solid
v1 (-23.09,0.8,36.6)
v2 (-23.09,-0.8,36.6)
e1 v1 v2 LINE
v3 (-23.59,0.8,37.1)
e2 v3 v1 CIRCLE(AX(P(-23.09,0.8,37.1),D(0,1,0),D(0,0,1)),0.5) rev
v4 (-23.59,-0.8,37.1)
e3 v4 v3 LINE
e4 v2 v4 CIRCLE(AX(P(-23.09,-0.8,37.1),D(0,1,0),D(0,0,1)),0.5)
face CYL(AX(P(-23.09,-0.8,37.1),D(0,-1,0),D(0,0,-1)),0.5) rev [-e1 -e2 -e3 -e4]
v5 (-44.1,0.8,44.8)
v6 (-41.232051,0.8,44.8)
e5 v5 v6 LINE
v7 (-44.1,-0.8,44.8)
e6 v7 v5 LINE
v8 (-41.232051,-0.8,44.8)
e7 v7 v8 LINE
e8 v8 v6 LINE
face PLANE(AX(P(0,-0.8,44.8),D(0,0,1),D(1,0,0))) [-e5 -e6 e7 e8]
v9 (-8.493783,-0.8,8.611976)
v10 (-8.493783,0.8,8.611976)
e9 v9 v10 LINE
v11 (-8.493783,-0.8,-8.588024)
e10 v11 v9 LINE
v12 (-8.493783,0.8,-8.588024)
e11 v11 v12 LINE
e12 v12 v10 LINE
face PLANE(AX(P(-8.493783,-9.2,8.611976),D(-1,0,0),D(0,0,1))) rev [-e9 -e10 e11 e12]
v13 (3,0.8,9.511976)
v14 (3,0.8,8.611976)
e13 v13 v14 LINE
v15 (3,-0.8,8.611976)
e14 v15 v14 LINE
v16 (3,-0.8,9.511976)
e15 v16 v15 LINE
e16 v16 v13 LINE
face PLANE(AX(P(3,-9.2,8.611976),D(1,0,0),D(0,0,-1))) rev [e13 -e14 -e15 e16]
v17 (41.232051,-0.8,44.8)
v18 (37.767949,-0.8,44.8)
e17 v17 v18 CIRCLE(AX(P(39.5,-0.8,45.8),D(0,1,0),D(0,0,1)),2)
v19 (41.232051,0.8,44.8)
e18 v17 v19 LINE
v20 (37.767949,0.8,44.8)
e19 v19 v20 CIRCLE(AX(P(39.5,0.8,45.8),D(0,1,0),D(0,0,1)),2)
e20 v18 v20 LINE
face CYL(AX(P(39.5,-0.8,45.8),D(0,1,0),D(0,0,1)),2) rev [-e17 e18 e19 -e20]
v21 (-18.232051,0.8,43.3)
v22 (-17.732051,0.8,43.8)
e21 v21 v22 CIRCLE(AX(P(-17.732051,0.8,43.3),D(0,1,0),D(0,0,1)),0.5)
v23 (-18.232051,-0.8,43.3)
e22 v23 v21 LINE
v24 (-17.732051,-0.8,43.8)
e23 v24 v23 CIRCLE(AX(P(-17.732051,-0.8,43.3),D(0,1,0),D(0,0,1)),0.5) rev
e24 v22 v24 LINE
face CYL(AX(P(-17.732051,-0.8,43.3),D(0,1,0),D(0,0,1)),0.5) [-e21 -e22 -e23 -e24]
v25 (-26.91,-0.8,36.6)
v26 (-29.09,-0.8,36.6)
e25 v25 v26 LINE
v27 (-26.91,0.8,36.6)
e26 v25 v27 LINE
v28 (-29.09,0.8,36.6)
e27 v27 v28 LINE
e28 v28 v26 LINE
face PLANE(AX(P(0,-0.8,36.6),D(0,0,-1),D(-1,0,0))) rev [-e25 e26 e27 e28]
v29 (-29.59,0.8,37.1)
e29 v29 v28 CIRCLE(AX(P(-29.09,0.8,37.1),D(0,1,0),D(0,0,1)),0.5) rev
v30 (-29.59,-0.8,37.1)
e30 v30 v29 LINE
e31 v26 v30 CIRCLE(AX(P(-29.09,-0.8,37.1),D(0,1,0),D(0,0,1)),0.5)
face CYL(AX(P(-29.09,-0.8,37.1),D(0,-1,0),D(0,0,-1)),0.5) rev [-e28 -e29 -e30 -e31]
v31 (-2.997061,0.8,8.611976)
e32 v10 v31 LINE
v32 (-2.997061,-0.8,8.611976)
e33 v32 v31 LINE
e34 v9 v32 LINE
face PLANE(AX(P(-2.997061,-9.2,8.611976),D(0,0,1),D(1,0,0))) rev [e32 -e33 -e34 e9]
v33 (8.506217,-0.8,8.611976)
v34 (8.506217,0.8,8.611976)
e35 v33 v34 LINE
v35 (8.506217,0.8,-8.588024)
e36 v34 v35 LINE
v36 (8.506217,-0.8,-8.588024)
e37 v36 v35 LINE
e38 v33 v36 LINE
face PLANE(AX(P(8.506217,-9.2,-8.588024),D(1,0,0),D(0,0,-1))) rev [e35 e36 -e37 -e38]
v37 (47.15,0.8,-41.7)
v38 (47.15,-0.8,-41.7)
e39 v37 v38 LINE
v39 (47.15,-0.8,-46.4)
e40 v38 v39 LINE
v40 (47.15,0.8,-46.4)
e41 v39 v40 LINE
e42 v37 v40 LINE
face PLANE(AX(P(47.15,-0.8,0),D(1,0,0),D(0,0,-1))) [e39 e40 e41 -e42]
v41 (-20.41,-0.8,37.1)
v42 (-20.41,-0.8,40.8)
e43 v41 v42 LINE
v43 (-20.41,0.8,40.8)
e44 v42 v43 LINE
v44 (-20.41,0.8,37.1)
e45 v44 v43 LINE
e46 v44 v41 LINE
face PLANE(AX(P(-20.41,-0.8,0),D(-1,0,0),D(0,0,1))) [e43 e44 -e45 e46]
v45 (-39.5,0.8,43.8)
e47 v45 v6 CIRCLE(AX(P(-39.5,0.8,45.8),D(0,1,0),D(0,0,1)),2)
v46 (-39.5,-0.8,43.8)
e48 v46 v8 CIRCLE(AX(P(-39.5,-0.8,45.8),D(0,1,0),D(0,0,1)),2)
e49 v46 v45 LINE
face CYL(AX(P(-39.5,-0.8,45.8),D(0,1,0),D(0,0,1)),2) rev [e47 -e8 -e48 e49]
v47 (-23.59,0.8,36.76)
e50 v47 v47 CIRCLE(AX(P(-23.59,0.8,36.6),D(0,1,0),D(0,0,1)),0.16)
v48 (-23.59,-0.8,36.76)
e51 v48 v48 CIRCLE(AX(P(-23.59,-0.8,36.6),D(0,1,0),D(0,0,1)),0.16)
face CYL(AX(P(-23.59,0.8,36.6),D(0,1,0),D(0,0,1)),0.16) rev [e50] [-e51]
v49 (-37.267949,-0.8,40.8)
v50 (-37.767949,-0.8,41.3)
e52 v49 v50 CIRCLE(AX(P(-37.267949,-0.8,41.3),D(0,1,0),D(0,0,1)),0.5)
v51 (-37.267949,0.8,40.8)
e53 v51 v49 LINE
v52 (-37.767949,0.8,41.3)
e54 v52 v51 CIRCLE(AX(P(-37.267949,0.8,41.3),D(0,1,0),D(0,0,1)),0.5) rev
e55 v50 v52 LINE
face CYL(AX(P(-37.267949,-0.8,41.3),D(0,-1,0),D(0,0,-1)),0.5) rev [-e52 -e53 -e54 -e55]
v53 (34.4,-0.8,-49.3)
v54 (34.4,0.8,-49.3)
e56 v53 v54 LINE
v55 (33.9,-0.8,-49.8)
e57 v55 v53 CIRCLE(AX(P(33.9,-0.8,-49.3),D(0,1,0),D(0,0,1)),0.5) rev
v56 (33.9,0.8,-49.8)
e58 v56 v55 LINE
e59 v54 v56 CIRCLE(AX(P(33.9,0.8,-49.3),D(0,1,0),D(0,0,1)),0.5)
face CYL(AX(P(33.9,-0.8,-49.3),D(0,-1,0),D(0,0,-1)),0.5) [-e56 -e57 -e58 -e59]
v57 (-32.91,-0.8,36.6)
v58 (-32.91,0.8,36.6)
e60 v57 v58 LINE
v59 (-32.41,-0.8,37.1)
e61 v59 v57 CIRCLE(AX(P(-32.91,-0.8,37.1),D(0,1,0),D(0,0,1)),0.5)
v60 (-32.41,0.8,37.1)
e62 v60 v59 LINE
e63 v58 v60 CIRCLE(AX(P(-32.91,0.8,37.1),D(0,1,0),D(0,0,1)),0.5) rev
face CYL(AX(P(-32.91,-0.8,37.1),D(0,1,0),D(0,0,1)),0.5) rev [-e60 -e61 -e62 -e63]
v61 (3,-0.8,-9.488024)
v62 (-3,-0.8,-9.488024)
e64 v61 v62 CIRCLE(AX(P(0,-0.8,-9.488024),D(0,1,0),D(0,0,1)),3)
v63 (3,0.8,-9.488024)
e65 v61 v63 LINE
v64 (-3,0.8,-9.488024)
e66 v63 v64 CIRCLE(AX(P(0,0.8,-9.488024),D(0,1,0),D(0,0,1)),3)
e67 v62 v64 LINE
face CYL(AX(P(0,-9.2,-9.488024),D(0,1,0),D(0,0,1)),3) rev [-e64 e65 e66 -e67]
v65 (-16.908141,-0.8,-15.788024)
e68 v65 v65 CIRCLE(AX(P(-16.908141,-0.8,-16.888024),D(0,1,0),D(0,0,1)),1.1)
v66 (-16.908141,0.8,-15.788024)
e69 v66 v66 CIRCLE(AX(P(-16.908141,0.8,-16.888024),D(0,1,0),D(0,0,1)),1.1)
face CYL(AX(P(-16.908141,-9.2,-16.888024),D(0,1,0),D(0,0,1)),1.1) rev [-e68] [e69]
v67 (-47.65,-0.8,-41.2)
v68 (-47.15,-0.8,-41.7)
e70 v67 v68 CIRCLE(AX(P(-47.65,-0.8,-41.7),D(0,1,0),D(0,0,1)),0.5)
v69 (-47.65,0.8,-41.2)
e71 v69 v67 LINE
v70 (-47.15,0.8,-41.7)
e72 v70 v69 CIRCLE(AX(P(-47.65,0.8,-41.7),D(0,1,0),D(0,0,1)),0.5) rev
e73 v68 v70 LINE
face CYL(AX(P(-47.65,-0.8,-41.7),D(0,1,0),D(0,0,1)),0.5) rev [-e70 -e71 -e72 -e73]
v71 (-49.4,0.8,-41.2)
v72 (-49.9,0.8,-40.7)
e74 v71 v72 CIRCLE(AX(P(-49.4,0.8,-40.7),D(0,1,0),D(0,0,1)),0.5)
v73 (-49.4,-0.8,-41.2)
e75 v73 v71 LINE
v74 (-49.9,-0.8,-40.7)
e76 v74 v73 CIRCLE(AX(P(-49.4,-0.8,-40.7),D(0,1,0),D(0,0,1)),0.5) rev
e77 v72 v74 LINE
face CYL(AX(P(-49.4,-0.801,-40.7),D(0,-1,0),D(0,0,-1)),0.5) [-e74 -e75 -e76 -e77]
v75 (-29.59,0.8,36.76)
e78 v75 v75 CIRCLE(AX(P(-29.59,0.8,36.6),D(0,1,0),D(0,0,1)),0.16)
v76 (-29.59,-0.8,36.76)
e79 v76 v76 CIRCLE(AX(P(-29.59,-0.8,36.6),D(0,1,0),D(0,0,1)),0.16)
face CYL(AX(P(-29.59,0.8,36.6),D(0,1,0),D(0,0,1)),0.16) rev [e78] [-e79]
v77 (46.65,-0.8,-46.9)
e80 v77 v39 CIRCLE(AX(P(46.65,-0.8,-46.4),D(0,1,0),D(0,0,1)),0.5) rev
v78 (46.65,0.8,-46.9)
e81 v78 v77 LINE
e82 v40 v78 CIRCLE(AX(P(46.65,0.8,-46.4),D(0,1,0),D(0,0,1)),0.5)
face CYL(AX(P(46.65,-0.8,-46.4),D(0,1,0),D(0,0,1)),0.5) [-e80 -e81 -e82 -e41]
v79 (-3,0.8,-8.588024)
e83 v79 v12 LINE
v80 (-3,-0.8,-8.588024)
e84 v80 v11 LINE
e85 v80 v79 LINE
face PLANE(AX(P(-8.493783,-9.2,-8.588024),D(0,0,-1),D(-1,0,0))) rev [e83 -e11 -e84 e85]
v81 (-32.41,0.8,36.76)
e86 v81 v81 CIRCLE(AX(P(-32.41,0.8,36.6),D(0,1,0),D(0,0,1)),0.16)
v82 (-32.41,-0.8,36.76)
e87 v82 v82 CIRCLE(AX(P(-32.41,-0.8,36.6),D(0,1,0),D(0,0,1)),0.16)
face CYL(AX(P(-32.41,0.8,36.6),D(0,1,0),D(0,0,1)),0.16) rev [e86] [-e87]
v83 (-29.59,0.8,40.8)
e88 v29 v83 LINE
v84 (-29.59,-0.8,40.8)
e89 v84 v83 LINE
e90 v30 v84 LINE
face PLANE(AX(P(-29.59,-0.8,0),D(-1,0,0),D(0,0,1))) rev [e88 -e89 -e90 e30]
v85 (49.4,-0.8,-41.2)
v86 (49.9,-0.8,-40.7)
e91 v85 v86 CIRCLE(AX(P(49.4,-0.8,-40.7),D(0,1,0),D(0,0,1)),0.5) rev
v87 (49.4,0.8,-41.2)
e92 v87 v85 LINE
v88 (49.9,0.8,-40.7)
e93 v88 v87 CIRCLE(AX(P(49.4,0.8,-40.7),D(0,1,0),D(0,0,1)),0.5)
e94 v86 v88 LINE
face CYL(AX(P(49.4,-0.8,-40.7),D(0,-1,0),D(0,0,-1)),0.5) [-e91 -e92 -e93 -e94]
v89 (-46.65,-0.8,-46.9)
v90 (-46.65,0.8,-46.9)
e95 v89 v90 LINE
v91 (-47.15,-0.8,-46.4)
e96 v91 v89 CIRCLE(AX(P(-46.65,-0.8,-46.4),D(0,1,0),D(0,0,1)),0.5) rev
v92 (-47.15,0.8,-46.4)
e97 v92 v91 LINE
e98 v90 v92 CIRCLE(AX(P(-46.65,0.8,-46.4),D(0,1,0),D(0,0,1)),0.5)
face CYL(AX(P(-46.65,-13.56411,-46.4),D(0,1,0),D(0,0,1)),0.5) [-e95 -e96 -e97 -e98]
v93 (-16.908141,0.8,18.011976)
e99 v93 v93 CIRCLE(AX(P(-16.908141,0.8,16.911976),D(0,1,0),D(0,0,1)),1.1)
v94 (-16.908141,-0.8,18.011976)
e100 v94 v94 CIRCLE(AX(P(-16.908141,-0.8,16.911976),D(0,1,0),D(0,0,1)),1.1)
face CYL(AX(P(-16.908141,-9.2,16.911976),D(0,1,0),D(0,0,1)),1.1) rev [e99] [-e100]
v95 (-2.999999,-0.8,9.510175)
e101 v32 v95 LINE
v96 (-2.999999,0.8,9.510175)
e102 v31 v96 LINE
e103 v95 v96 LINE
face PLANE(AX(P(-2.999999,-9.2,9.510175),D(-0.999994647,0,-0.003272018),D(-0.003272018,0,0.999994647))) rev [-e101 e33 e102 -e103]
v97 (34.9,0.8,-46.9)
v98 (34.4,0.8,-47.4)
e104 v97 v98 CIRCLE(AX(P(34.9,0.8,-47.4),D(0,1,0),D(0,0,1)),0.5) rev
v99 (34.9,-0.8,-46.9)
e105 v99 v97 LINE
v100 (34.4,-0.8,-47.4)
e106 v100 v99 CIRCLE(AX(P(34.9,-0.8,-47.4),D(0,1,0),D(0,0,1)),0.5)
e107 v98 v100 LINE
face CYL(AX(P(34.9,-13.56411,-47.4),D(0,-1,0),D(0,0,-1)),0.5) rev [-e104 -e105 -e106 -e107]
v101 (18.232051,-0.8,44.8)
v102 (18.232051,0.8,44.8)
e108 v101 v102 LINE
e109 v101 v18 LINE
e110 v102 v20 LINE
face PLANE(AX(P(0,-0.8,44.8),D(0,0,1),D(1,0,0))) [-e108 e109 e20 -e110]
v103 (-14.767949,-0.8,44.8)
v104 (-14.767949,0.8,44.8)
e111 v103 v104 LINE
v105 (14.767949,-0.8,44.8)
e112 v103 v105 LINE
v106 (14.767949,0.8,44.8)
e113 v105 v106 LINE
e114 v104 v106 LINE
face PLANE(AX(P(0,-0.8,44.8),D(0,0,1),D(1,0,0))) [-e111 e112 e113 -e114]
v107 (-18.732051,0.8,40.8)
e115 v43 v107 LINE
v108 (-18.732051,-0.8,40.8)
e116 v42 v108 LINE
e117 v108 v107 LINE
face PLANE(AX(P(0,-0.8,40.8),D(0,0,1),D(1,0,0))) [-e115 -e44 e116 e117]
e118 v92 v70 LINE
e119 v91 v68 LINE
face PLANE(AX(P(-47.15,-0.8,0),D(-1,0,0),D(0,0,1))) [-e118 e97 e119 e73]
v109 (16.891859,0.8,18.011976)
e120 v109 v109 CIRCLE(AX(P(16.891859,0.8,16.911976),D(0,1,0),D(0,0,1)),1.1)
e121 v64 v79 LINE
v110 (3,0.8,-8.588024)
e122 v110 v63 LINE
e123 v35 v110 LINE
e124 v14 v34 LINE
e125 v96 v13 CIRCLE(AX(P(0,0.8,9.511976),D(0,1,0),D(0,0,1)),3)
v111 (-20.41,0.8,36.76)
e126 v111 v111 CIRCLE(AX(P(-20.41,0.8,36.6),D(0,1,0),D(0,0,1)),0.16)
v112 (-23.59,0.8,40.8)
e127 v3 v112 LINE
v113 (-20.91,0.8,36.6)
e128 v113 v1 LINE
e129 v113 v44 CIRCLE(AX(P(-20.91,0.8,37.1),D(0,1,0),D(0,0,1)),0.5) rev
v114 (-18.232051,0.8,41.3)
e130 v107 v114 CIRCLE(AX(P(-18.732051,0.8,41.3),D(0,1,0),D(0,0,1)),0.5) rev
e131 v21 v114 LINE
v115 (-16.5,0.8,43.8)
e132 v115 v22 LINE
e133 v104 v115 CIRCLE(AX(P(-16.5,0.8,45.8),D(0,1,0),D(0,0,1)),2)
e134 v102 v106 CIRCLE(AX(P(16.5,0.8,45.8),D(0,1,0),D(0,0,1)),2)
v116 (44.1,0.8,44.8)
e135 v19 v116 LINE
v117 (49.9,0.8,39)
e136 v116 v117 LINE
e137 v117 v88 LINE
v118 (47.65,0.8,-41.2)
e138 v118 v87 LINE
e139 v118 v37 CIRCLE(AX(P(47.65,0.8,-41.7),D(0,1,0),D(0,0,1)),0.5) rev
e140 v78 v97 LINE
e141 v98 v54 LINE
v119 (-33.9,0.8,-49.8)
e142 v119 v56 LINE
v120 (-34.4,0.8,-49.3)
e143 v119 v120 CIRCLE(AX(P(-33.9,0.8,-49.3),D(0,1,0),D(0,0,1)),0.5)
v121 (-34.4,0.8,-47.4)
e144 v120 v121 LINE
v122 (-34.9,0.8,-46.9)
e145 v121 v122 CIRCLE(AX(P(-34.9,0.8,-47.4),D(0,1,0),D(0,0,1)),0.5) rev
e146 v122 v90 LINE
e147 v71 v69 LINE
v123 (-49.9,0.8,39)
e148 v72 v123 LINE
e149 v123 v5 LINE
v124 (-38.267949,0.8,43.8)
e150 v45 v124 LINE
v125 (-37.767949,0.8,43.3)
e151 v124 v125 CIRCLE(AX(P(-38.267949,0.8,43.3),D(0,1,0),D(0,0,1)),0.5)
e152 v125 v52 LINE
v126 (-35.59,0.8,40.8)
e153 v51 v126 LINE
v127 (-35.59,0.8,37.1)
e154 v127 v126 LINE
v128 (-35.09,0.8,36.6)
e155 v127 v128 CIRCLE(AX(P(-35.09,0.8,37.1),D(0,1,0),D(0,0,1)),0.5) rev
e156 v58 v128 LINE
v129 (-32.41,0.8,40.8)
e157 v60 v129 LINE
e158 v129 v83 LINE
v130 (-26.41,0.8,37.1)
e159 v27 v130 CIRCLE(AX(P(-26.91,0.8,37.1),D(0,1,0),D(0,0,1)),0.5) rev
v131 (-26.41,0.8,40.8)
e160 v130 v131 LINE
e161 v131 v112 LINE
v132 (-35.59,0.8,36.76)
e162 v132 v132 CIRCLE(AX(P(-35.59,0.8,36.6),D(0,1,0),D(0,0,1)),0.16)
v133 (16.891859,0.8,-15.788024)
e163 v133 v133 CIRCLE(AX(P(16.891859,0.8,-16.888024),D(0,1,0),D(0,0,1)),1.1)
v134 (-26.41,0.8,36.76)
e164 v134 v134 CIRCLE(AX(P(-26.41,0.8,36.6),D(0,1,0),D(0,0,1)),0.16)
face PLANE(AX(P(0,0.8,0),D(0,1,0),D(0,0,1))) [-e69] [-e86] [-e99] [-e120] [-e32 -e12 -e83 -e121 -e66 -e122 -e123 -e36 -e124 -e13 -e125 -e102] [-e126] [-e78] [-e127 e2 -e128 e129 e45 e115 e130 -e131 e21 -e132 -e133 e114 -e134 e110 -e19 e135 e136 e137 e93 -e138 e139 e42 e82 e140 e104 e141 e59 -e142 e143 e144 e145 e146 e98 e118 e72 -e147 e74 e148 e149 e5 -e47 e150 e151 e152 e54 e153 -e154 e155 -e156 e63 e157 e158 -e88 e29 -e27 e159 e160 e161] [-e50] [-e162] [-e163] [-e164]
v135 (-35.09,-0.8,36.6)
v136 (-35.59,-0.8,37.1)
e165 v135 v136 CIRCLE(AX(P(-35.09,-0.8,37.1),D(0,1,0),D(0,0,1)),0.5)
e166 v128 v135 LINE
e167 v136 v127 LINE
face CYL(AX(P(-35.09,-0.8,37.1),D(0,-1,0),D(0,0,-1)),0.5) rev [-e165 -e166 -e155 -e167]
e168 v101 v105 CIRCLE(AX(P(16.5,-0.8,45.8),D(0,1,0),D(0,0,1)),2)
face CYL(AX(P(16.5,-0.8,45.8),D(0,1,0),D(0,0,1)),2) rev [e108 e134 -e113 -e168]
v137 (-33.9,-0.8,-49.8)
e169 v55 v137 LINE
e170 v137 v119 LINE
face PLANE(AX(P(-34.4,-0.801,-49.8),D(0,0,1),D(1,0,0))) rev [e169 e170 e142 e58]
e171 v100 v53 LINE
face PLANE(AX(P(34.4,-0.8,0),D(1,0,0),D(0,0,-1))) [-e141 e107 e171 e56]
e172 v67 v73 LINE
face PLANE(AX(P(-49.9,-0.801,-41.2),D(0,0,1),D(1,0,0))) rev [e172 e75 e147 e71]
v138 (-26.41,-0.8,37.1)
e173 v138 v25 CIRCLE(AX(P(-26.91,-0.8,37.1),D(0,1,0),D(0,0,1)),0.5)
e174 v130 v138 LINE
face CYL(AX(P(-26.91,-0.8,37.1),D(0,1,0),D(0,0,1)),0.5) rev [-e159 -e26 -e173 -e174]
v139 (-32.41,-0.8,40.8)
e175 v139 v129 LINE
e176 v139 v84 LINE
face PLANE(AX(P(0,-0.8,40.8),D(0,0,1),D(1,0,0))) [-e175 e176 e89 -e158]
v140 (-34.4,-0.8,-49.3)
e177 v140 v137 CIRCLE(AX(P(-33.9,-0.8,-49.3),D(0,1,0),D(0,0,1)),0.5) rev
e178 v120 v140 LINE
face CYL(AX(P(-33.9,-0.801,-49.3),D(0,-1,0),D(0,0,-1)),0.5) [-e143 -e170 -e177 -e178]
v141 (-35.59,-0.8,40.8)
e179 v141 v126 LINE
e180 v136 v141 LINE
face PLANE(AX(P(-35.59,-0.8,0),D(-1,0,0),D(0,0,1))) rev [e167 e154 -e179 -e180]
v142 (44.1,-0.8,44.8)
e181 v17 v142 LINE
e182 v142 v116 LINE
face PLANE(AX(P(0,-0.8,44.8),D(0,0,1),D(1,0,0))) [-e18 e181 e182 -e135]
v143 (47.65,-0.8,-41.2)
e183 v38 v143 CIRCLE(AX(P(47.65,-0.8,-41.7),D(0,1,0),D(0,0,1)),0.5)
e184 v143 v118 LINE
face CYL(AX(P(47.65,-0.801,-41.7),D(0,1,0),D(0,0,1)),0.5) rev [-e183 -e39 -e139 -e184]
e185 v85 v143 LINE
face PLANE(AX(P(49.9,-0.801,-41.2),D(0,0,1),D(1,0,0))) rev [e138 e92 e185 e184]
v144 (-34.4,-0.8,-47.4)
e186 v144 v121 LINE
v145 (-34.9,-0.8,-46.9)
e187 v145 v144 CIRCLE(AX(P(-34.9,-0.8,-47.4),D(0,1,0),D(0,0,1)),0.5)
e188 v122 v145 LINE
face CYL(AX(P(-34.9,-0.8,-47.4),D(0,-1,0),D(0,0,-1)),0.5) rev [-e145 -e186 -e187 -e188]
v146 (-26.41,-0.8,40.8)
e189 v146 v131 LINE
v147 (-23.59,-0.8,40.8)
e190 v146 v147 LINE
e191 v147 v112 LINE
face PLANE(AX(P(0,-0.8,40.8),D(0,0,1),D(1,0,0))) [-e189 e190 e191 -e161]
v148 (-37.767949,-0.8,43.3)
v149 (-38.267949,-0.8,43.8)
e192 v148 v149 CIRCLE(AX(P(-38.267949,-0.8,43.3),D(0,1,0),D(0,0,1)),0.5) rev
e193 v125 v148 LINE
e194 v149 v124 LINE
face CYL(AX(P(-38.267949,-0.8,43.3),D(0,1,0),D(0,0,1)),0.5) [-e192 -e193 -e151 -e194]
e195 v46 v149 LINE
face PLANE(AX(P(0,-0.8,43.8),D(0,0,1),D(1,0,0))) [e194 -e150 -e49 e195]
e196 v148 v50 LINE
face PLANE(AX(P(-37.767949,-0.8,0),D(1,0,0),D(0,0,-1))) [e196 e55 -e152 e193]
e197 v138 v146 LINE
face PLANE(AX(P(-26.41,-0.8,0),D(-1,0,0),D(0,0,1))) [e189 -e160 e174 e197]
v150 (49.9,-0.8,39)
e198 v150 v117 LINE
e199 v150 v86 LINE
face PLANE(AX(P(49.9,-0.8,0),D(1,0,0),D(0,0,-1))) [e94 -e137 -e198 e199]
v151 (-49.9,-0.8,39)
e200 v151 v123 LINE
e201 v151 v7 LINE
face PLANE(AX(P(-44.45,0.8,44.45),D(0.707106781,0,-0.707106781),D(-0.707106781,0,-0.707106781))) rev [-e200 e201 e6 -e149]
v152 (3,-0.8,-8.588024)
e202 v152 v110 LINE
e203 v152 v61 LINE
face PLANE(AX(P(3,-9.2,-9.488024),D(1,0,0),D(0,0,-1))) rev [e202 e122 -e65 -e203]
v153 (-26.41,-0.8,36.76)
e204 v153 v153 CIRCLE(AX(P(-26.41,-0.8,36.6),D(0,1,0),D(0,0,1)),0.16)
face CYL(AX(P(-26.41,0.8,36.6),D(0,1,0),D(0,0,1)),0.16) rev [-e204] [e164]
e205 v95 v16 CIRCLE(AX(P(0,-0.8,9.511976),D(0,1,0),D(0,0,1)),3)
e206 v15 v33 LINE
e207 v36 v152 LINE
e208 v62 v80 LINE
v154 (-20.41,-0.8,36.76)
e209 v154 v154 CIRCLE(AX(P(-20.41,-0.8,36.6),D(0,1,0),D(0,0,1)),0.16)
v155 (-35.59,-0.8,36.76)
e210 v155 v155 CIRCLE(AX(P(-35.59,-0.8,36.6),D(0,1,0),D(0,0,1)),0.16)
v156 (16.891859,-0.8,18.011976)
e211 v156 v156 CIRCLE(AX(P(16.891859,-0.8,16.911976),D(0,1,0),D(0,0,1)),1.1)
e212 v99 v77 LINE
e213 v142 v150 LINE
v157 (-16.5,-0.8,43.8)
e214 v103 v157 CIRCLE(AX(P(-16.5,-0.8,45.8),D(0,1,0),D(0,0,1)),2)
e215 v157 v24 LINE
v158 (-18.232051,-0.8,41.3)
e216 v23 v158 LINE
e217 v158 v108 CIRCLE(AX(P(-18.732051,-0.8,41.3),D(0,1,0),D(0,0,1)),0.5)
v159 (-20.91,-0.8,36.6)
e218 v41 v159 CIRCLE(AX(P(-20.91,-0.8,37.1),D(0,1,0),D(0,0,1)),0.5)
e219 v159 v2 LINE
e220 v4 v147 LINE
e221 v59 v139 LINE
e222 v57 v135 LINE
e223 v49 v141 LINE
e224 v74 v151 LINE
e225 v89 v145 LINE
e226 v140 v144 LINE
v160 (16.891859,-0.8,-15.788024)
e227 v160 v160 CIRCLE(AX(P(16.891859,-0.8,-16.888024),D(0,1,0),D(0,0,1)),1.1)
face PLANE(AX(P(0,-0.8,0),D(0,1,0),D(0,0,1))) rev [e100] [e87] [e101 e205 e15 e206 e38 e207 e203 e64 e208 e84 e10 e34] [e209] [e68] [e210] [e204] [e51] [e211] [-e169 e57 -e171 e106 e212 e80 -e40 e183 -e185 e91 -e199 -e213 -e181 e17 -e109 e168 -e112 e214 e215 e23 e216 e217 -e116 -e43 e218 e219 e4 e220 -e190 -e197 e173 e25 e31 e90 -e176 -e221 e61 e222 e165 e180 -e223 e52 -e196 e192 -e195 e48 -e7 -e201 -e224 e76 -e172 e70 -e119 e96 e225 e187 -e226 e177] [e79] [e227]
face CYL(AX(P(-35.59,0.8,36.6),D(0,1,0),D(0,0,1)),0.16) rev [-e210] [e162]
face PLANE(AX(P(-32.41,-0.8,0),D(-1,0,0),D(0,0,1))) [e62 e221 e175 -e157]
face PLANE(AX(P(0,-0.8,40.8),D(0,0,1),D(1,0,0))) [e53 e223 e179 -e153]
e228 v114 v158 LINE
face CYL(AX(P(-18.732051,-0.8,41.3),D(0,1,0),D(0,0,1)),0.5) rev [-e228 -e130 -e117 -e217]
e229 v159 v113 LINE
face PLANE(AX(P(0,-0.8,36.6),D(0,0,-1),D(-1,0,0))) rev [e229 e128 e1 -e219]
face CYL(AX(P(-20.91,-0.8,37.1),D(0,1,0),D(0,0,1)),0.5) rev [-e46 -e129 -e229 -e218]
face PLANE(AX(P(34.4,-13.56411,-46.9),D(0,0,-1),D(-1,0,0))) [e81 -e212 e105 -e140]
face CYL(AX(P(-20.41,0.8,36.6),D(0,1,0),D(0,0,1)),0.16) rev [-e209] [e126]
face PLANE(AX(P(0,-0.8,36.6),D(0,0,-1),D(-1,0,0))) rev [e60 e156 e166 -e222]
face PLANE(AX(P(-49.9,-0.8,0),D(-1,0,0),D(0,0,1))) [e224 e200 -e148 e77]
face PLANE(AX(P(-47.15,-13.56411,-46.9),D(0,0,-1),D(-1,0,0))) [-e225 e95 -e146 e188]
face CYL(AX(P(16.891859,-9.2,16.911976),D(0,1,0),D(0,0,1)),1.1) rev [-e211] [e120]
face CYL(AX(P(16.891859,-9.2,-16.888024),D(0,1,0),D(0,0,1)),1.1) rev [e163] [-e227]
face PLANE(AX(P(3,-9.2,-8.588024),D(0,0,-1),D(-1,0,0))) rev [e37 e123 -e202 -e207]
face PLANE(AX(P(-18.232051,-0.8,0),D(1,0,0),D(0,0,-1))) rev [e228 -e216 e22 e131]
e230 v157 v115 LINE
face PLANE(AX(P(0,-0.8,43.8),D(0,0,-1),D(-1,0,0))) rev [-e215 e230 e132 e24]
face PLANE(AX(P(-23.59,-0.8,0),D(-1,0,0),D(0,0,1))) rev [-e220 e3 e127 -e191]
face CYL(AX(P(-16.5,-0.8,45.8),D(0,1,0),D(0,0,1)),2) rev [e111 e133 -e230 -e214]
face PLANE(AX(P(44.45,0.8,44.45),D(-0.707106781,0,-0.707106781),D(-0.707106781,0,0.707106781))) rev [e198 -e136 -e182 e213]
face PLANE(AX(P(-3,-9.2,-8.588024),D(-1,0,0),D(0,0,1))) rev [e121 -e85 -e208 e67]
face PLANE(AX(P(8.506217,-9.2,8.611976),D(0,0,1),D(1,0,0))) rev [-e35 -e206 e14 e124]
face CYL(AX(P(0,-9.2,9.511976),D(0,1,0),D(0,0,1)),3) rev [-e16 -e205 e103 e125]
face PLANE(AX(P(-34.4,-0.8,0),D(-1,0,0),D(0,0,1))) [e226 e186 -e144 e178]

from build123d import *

# Parameters (mm, degrees)
GENERICCARDPCBDEFINITION_FILLET3_START   = -0.8
GENERICCARDPCBDEFINITION_FILLET3_OUTLI_R = 0.16
GENERICCARDPCBDEFINITION_FILLET3_DEPTH   = 1.6
SKETCH1_R                                = 1.1
CUT_EXTRUDE1_DEPTH                       = 10


# Read off the part's stored shape, not the designer's step: <GenericCardPCBDefinition>-<Fillet3>
with BuildPart() as part:
    # <GenericCardPCBDefinition>-<Fillet3> outli → <GenericCardPCBDefinition>-<Fillet3> (new body)
    with BuildSketch(Plane(origin=(0, 0, 0), x_dir=(1, 0, 0), z_dir=(0, 1, 0)).offset(GENERICCARDPCBDEFINITION_FILLET3_START)):
        with BuildLine():
            ThreePointArc((-41.232050808, -44.8), (-40.5, -44.067949192), (-39.5, -43.8))
            Line((-39.5, -43.8), (-38.267949192, -43.8))
            ThreePointArc((-38.267949192, -43.8), (-37.914395801, -43.653553391), (-37.767949192, -43.3))
            Line((-37.767949192, -43.3), (-37.767949192, -41.3))
            ThreePointArc((-37.767949192, -41.3), (-37.621502583, -40.946446609), (-37.267949192, -40.8))
            Line((-37.267949192, -40.8), (-35.59, -40.8))
            Line((-35.59, -40.8), (-35.59, -37.1))
            ThreePointArc((-35.59, -37.1), (-35.443553391, -36.746446609), (-35.09, -36.6))
            Line((-35.09, -36.6), (-32.91, -36.6))
            ThreePointArc((-32.91, -36.6), (-32.556446609, -36.746446609), (-32.41, -37.1))
            Line((-32.41, -37.1), (-32.41, -40.8))
            Line((-32.41, -40.8), (-29.59, -40.8))
            Line((-29.59, -40.8), (-29.59, -37.1))
            ThreePointArc((-29.59, -37.1), (-29.443553391, -36.746446609), (-29.09, -36.6))
            Line((-29.09, -36.6), (-26.91, -36.6))
            ThreePointArc((-26.91, -36.6), (-26.556446609, -36.746446609), (-26.41, -37.1))
            Line((-26.41, -37.1), (-26.41, -40.8))
            Line((-26.41, -40.8), (-23.59, -40.8))
            Line((-23.59, -40.8), (-23.59, -37.1))
            ThreePointArc((-23.59, -37.1), (-23.443553391, -36.746446609), (-23.09, -36.6))
            Line((-23.09, -36.6), (-20.91, -36.6))
            ThreePointArc((-20.91, -36.6), (-20.556446609, -36.746446609), (-20.41, -37.1))
            Line((-20.41, -37.1), (-20.41, -40.8))
            Line((-20.41, -40.8), (-18.732050808, -40.8))
            ThreePointArc((-18.732050808, -40.8), (-18.378497417, -40.946446609), (-18.232050808, -41.3))
            Line((-18.232050808, -41.3), (-18.232050808, -43.3))
            ThreePointArc((-18.232050808, -43.3), (-18.085604199, -43.653553391), (-17.732050808, -43.8))
            Line((-17.732050808, -43.8), (-16.5, -43.8))
            ThreePointArc((-16.5, -43.8), (-15.5, -44.067949192), (-14.767949192, -44.8))
            Line((-14.767949192, -44.8), (14.767949192, -44.8))
            ThreePointArc((14.767949192, -44.8), (16.5, -43.8), (18.232050808, -44.8))
            Line((18.232050808, -44.8), (37.767949192, -44.8))
            ThreePointArc((37.767949192, -44.8), (39.5, -43.8), (41.232050808, -44.8))
            Line((41.232050808, -44.8), (44.1, -44.8))
            Line((44.1, -44.8), (49.9, -39))
            Line((49.9, -39), (49.9, 40.7))
            ThreePointArc((49.9, 40.7), (49.753553391, 41.053553391), (49.4, 41.2))
            Line((49.4, 41.2), (47.65, 41.2))
            ThreePointArc((47.65, 41.2), (47.296446609, 41.346446609), (47.15, 41.7))
            Line((47.15, 41.7), (47.15, 46.4))
            ThreePointArc((47.15, 46.4), (47.003553391, 46.753553391), (46.65, 46.9))
            Line((46.65, 46.9), (34.9, 46.9))
            ThreePointArc((34.9, 46.9), (34.546446609, 47.046446609), (34.4, 47.4))
            Line((34.4, 47.4), (34.4, 49.3))
            ThreePointArc((34.4, 49.3), (34.253553391, 49.653553391), (33.9, 49.8))
            Line((33.9, 49.8), (-33.9, 49.8))
            ThreePointArc((-33.9, 49.8), (-34.253553391, 49.653553391), (-34.4, 49.3))
            Line((-34.4, 49.3), (-34.4, 47.4))
            ThreePointArc((-34.4, 47.4), (-34.546446609, 47.046446609), (-34.9, 46.9))
            Line((-34.9, 46.9), (-46.65, 46.9))
            ThreePointArc((-46.65, 46.9), (-47.003553391, 46.753553391), (-47.15, 46.4))
            Line((-47.15, 46.4), (-47.15, 41.7))
            ThreePointArc((-47.15, 41.7), (-47.296446609, 41.346446609), (-47.65, 41.2))
            Line((-47.65, 41.2), (-49.4, 41.2))
            ThreePointArc((-49.4, 41.2), (-49.753553391, 41.053553391), (-49.9, 40.7))
            Line((-49.9, 40.7), (-49.9, -39))
            Line((-49.9, -39), (-44.1, -44.8))
            Line((-44.1, -44.8), (-41.232050808, -44.8))
        make_face()
        with Locations((-35.59, -36.6)):
            Circle(GENERICCARDPCBDEFINITION_FILLET3_OUTLI_R, mode=Mode.SUBTRACT)
        with Locations((-32.41, -36.6)):
            Circle(GENERICCARDPCBDEFINITION_FILLET3_OUTLI_R, mode=Mode.SUBTRACT)
        with Locations((-29.59, -36.6)):
            Circle(GENERICCARDPCBDEFINITION_FILLET3_OUTLI_R, mode=Mode.SUBTRACT)
        with Locations((-26.41, -36.6)):
            Circle(GENERICCARDPCBDEFINITION_FILLET3_OUTLI_R, mode=Mode.SUBTRACT)
        with Locations((-23.59, -36.6)):
            Circle(GENERICCARDPCBDEFINITION_FILLET3_OUTLI_R, mode=Mode.SUBTRACT)
        with Locations((-20.41, -36.6)):
            Circle(GENERICCARDPCBDEFINITION_FILLET3_OUTLI_R, mode=Mode.SUBTRACT)
    extrude(amount=GENERICCARDPCBDEFINITION_FILLET3_DEPTH)

    # Sketch1 → Cut-Extrude1 (cut)
    with BuildSketch(Plane(origin=(0, 0.8, 0), x_dir=(1, 0, 0), z_dir=(0, 1, 0))):
        with Locations(Location((16.891859219, -16.911976124, 0), (0, 0, 270))):
            Circle(SKETCH1_R)
        with Locations(Location((16.891859219, 16.888023876, 0), (0, 0, 270))):
            Circle(SKETCH1_R)
        with Locations(Location((-16.908140781, -16.911976124, 0), (0, 0, 270))):
            Circle(SKETCH1_R)
        with Locations(Location((-16.908140781, 16.888023876, 0), (0, 0, 270))):
            Circle(SKETCH1_R)
        with BuildLine():
            Line((8.506216867, -8.611976124), (3, -8.611976124))
            Line((3, -8.611976124), (3, -9.511976124))
            ThreePointArc((3, -9.511976124), (-0.000900642, -12.511975988), (-2.999999459, -9.51017484))
            Line((-2.999999459, -9.51017484), (-2.997060521, -8.611976124))
            Line((-2.997060521, -8.611976124), (-8.493783133, -8.611976124))
            Line((-8.493783133, -8.611976124), (-8.493783133, 8.588023876))
            Line((-8.493783133, 8.588023876), (-3, 8.588023876))
            Line((-3, 8.588023876), (-3, 9.488023876))
            ThreePointArc((-3, 9.488023876), (0, 12.488023876), (3, 9.488023876))
            Line((3, 9.488023876), (3, 8.588023876))
            Line((3, 8.588023876), (8.506216867, 8.588023876))
            Line((8.506216867, 8.588023876), (8.506216867, -8.611976124))
        make_face()
    extrude(amount=-CUT_EXTRUDE1_DEPTH, mode=Mode.SUBTRACT)


solid = part.part
